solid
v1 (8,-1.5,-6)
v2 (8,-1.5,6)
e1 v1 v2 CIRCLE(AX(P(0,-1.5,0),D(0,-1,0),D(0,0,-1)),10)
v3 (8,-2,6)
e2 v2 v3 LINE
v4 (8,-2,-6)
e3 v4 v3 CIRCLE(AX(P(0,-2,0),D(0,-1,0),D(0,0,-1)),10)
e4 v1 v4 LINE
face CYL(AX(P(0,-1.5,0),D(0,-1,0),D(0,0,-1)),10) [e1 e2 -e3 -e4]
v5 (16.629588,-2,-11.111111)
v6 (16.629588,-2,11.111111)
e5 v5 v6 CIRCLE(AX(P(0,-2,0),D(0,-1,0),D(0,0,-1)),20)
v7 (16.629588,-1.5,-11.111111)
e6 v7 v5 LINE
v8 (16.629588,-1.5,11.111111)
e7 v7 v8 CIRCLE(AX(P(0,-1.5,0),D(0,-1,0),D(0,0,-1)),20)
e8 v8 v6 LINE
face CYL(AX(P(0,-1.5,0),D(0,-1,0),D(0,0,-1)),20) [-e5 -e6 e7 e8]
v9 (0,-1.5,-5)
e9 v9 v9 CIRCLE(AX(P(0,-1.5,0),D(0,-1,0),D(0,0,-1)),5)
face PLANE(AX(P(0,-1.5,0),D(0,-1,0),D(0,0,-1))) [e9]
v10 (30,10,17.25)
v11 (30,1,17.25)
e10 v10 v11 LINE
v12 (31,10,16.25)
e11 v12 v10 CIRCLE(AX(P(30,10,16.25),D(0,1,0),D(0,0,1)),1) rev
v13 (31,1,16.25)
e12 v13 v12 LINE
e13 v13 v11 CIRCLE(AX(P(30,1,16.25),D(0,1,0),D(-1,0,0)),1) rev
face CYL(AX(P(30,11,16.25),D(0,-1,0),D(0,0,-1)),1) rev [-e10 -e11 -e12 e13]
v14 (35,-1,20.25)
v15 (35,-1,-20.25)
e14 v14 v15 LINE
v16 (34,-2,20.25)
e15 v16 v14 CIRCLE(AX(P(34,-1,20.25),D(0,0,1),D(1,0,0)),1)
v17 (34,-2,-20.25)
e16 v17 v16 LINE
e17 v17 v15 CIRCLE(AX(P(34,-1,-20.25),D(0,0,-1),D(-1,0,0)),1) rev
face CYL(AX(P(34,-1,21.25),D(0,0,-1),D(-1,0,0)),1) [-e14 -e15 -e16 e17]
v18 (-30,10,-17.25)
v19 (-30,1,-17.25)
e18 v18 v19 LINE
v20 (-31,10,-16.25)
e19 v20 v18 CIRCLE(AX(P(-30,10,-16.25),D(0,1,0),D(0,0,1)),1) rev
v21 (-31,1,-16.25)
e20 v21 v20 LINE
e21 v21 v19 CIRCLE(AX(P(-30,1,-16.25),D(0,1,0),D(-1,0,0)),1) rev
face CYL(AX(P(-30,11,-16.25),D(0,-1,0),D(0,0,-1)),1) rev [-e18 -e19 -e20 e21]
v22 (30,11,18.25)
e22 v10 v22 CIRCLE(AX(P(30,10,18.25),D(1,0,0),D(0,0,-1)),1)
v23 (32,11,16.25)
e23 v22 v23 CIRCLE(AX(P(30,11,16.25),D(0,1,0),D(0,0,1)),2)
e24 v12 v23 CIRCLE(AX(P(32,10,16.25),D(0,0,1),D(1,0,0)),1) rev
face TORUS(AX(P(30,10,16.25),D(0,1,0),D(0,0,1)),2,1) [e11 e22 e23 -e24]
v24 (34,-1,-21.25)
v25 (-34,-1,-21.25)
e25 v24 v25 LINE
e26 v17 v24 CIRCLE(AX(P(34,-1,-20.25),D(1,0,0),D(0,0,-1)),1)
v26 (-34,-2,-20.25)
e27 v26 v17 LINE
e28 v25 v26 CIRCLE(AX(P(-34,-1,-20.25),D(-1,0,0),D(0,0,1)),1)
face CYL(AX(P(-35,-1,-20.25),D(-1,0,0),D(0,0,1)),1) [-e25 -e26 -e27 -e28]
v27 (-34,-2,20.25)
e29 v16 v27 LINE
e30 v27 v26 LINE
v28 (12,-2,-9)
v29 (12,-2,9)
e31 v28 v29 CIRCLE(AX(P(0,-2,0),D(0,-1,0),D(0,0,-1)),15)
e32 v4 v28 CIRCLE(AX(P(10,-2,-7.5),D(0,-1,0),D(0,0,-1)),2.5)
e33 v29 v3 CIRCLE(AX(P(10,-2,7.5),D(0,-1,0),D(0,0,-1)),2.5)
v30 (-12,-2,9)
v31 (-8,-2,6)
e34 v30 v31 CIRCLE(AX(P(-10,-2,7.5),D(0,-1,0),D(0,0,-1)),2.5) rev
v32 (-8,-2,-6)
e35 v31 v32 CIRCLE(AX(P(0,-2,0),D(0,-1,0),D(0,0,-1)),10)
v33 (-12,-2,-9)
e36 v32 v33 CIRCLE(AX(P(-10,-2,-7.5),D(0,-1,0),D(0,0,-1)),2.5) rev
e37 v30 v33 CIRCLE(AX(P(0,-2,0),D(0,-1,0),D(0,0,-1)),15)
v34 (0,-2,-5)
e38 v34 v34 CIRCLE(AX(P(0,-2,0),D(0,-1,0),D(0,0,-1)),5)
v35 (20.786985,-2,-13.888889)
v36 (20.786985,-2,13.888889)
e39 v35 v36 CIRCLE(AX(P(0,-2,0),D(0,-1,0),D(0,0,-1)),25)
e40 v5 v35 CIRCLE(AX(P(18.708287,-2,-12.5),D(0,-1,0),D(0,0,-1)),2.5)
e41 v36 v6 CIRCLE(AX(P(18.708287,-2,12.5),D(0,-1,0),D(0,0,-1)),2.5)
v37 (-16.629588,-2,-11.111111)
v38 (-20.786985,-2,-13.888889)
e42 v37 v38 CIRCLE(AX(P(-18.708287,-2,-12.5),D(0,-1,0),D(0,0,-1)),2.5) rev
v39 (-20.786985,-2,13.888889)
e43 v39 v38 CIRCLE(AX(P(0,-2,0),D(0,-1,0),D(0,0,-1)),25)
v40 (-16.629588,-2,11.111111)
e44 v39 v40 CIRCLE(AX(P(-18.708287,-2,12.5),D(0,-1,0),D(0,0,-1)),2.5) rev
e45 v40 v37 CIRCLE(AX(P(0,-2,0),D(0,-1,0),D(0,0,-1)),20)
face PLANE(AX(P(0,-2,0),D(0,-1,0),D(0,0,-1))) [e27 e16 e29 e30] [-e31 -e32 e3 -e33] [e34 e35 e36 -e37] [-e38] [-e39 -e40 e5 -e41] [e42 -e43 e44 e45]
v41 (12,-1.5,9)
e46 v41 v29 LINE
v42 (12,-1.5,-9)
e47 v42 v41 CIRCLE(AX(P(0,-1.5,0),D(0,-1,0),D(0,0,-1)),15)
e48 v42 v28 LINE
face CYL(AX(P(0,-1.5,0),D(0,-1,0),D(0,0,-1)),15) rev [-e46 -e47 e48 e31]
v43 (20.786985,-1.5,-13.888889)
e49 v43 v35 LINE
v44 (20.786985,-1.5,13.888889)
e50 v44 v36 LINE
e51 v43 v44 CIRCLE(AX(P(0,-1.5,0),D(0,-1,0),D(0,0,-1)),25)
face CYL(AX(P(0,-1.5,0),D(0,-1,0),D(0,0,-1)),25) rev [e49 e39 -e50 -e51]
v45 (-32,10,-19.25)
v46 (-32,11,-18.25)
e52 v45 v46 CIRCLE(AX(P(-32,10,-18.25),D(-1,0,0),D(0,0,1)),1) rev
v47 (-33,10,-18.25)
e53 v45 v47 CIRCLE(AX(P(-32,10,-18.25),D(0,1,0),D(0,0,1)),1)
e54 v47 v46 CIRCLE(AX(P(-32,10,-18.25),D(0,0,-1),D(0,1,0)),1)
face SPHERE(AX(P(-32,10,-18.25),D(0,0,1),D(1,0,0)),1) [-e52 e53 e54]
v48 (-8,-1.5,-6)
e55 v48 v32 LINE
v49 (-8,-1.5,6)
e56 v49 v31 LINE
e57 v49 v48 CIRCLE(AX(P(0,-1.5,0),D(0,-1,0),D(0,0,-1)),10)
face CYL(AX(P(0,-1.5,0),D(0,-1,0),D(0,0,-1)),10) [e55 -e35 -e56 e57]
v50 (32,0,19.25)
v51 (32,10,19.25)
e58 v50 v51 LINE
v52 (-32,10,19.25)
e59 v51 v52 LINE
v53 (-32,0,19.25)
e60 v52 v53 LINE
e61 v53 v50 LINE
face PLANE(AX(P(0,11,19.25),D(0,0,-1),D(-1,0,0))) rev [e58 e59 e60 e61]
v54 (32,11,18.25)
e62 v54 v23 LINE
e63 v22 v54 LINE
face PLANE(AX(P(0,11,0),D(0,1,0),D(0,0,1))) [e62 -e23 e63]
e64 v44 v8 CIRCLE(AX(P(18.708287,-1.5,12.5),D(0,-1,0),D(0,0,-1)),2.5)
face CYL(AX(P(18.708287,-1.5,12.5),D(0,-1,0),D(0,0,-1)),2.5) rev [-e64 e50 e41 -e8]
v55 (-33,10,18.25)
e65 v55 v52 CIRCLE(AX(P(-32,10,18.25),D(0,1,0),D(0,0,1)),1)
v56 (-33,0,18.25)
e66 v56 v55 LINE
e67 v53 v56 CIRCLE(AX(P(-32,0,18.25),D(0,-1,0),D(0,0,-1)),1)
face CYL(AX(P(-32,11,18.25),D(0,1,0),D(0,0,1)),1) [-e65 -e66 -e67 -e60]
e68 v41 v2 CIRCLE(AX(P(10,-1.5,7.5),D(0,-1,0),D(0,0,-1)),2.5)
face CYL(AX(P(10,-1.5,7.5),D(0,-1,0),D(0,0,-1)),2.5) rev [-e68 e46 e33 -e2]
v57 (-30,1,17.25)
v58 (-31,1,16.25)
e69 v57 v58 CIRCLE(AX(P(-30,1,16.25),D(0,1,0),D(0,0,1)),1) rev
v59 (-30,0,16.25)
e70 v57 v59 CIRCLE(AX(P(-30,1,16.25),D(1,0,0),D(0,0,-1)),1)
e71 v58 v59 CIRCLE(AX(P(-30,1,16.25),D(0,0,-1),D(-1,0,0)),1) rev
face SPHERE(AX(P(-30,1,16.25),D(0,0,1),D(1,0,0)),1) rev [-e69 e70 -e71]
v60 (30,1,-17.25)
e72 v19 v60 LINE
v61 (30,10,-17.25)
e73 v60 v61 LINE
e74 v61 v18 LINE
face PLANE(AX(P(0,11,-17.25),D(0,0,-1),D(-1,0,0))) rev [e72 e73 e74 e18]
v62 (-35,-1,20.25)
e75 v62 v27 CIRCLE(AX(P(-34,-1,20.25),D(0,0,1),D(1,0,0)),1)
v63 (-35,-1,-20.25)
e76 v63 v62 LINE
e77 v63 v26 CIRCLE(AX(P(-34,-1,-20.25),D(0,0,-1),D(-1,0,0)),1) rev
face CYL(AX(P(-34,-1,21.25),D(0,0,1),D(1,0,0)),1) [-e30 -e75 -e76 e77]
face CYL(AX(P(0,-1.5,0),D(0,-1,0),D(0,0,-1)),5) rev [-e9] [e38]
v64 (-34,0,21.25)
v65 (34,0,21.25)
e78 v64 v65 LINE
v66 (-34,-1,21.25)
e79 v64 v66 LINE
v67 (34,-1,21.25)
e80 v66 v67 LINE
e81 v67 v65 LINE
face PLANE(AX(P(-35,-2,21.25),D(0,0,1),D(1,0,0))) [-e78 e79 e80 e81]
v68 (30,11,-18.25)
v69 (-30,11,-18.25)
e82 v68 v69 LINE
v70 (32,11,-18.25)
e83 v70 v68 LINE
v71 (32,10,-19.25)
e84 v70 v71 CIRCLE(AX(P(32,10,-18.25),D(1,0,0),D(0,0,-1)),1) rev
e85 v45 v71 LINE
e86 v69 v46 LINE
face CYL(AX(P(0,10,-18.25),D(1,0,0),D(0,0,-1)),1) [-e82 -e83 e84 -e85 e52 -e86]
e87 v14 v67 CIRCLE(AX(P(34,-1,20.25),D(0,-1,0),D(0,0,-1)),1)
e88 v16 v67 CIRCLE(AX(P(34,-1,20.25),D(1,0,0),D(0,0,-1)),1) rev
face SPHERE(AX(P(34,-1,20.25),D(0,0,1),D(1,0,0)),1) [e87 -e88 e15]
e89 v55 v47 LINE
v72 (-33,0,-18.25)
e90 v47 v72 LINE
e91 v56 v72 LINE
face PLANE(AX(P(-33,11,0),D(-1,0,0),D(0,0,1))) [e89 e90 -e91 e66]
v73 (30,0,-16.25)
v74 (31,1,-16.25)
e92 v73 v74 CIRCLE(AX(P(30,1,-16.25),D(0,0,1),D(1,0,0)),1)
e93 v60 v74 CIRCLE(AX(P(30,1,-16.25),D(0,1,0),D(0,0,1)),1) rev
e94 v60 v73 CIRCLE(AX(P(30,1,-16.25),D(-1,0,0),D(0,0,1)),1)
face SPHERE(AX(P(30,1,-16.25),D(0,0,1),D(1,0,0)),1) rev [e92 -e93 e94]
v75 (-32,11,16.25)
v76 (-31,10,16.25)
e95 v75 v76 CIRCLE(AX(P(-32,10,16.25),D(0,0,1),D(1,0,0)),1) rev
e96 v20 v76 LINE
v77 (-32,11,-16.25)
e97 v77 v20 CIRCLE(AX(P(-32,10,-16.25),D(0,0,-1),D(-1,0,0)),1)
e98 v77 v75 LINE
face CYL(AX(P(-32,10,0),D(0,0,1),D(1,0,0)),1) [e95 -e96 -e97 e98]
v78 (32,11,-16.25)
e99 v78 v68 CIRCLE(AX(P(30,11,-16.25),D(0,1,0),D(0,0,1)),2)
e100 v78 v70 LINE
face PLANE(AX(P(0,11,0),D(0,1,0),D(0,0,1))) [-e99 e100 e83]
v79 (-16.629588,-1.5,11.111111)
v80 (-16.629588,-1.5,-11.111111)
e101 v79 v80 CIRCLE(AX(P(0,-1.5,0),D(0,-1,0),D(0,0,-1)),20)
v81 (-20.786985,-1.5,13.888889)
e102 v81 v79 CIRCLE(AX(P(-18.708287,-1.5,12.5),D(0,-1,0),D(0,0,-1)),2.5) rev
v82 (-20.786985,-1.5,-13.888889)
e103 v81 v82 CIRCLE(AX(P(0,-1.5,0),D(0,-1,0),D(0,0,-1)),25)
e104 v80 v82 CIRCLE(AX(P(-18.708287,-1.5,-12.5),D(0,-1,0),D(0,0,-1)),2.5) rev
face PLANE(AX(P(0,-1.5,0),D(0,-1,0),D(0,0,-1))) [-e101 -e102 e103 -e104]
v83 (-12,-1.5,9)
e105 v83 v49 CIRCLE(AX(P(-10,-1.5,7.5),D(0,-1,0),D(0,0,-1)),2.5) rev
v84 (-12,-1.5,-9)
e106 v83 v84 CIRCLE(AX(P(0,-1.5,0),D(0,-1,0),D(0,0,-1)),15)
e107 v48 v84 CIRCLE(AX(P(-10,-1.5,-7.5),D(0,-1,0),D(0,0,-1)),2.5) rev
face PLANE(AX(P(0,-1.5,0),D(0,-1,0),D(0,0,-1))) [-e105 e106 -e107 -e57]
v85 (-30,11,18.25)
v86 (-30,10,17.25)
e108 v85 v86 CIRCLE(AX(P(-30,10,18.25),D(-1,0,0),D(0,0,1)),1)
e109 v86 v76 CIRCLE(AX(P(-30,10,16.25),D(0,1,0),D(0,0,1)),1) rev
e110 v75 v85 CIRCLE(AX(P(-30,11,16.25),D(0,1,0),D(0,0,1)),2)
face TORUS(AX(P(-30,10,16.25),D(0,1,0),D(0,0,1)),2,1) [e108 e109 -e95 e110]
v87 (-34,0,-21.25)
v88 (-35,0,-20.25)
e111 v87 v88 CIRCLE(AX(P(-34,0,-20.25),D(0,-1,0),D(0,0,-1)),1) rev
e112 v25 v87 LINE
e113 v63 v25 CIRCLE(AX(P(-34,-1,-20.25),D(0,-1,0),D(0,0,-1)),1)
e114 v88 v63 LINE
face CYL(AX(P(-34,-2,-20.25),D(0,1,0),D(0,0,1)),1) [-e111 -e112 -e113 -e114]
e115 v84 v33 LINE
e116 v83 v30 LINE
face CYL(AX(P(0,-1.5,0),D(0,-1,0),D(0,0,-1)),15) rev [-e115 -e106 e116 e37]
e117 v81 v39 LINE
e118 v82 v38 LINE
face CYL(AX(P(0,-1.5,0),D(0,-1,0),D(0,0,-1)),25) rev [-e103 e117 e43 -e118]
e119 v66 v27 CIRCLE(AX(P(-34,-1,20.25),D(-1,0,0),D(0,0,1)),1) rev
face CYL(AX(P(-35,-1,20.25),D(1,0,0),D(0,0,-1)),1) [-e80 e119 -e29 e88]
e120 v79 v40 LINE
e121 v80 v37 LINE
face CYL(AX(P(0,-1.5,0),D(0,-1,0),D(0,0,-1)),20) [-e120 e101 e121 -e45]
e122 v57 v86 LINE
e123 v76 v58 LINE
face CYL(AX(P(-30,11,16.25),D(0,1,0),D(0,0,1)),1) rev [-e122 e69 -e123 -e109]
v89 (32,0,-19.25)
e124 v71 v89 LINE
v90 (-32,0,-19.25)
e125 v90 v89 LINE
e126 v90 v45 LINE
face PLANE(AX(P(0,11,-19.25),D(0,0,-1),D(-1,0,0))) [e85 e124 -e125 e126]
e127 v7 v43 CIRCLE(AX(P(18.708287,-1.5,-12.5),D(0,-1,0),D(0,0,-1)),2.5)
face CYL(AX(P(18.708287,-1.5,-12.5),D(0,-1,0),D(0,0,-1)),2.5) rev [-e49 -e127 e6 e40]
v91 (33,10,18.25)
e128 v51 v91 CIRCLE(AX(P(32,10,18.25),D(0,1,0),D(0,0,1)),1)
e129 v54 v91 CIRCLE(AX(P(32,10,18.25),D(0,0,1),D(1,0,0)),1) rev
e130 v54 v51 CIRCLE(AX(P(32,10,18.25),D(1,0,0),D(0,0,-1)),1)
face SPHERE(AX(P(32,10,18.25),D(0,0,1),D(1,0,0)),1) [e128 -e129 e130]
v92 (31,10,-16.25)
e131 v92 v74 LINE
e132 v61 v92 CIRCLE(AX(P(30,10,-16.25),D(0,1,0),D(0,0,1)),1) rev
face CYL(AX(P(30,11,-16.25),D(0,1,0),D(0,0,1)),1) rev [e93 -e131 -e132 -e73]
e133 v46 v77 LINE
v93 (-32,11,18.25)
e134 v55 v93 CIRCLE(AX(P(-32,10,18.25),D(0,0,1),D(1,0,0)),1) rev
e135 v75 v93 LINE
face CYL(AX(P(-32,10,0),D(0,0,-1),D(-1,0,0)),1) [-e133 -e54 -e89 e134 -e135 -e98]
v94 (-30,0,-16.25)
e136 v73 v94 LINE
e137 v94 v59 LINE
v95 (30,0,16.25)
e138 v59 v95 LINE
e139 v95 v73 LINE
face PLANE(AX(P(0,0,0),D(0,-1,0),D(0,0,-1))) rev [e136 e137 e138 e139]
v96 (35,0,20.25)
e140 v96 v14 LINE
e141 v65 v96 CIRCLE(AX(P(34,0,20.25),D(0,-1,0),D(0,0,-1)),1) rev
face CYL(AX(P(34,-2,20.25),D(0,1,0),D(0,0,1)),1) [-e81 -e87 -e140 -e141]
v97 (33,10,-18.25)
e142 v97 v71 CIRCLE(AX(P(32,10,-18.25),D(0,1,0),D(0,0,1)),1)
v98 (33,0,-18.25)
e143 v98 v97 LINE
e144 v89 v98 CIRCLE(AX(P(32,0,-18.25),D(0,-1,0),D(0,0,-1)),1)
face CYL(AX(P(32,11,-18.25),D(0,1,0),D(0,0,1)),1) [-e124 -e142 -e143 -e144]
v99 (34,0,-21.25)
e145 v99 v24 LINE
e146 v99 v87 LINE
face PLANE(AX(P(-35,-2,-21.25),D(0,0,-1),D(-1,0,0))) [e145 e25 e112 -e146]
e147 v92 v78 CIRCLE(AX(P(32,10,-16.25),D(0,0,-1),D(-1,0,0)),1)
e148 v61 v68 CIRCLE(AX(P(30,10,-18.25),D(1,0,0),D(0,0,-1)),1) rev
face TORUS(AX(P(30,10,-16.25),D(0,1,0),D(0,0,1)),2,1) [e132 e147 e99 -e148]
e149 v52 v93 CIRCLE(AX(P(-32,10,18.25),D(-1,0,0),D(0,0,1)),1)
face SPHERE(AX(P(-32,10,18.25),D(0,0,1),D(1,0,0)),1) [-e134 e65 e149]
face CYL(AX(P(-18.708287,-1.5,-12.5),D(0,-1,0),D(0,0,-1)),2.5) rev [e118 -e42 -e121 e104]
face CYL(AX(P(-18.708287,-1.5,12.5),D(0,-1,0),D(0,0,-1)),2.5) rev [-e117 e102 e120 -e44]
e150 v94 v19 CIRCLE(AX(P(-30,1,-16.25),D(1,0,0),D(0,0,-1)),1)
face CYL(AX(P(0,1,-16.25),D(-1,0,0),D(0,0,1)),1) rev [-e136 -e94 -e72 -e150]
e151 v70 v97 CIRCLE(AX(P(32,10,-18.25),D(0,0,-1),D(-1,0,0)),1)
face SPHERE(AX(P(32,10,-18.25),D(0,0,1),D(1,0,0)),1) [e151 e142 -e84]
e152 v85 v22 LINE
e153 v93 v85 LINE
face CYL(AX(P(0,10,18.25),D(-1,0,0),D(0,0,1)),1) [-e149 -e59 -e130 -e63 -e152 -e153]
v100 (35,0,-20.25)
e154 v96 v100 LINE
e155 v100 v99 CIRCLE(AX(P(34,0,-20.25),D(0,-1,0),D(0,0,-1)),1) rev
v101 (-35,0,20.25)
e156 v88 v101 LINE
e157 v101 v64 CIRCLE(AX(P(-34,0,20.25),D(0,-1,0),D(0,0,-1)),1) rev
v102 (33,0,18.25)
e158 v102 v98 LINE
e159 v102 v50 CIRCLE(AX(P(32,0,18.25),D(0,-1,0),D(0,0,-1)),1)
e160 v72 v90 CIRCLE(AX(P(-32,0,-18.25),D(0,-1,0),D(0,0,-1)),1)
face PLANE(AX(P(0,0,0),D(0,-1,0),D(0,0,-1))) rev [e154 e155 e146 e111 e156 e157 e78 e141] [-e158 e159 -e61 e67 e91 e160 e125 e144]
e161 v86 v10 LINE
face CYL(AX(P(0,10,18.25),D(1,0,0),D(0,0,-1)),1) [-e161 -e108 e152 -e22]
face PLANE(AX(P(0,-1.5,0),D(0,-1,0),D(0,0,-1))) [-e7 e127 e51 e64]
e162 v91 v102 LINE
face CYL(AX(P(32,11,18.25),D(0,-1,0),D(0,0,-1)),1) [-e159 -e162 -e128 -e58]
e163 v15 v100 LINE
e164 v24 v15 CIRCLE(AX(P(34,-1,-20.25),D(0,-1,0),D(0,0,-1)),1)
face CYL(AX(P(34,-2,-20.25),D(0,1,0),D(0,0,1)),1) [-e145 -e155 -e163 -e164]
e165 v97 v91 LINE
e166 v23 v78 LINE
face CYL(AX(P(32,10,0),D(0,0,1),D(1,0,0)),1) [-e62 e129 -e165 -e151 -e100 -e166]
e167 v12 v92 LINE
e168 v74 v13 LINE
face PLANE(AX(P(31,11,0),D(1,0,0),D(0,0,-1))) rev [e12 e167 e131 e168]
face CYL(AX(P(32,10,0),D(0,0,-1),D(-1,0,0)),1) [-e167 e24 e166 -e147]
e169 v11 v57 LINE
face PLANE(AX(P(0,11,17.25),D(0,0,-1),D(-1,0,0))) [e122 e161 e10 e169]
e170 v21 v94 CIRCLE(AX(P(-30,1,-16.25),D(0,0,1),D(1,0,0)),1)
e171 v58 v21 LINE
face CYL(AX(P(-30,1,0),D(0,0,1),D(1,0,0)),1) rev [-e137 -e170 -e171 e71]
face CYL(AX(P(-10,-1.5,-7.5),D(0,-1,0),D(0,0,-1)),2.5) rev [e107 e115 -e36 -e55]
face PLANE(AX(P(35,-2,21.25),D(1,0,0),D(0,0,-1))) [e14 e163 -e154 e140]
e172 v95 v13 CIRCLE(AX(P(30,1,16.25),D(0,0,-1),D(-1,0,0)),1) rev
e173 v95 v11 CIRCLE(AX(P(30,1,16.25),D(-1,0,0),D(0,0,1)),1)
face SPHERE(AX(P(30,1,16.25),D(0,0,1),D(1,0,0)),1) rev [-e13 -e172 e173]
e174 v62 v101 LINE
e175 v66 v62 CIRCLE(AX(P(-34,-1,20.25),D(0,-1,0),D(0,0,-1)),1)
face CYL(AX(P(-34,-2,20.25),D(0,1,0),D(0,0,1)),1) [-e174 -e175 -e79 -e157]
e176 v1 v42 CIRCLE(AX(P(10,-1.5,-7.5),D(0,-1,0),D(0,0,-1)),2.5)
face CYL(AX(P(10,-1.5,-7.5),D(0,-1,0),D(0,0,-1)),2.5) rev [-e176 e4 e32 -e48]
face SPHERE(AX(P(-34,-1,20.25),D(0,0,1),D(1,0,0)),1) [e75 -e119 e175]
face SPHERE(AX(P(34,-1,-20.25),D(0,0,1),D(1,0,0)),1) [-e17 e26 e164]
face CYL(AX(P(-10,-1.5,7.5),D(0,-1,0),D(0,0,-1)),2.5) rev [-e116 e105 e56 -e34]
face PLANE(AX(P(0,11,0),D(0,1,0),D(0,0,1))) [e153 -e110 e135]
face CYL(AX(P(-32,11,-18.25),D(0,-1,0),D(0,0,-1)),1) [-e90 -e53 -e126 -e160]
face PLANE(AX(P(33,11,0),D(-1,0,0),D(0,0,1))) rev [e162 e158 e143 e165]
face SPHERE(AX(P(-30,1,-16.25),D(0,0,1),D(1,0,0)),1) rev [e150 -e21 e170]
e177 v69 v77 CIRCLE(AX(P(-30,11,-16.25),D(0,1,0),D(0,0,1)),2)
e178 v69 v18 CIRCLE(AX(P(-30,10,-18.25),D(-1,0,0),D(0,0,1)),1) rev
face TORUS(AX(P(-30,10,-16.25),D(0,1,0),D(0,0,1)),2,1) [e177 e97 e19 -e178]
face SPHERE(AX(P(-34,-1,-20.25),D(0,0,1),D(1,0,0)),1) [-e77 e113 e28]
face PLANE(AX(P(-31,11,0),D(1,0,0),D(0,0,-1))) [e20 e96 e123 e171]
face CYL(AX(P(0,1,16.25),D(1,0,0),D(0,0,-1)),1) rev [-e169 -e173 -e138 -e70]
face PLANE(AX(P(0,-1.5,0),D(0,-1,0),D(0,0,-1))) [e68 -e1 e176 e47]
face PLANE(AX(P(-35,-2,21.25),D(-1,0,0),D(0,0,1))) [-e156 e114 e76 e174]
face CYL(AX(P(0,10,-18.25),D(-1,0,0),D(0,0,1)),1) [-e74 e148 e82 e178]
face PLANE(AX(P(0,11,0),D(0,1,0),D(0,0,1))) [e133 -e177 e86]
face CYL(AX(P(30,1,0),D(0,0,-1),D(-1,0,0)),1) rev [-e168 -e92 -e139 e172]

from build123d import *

# Parameters (mm, degrees)
SKETCH1_W           = 70
SKETCH1_H           = 42.5
BOSS_EXTRUDE1_DEPTH = 2
SKETCH2_W           = 66
SKETCH2_H           = 38.5
SKETCH2_W_2         = 62
SKETCH2_H_2         = 34.5
BOSS_EXTRUDE2_DEPTH = 11
FILLET1_R           = 1
SKETCH3_R           = 5
CUT_EXTRUDE1_DEPTH  = 0.5


with BuildPart() as part:
    # Sketch1 → Boss-Extrude1 (new body)
    with BuildSketch(Plane(origin=(0, 0, 0), x_dir=(1, 0, 0), z_dir=(0, 1, 0))):
        Rectangle(SKETCH1_W, SKETCH1_H)
    extrude(amount=-BOSS_EXTRUDE1_DEPTH)

    # Sketch2 → Boss-Extrude2 (add)
    with BuildSketch(Plane(origin=(0, 0, 0), x_dir=(-1, 0, 0), z_dir=(0, 1, 0))):
        Rectangle(SKETCH2_W, SKETCH2_H)
        Rectangle(SKETCH2_W_2, SKETCH2_H_2, mode=Mode.SUBTRACT)
    extrude(amount=BOSS_EXTRUDE2_DEPTH)

    # Fillet1
    fillet1_edges = [part.edges().sort_by_distance(p)[0] for p in [
        (35, -2, 0),
        (0, -2, -21.25),
        (0, 0, -17.25),
        (-31, 5.5, -17.25),
        (31, 0, 0),
        (31, 5.5, -17.25),
        (0, 11, 17.25),
        (31, 5.5, 17.25),
        (-33, 5.5, 19.25),
        (33, 5.5, 19.25),
        (0, 11, -19.25),
        (33, 5.5, -19.25),
        (-33, 11, 0),
        (-33, 5.5, -19.25),
        (-31, 11, 0),
        (-31, 5.5, 17.25),
        (0, 11, 19.25),
        (33, 11, 0),
        (0, 11, -17.25),
        (31, 11, 0),
        (-31, 0, 0),
        (0, 0, 17.25),
        (-35, -2, 0),
        (-35, -1, -21.25),
        (35, -1, -21.25),
        (35, -1, 21.25),
        (-35, -1, 21.25),
        (0, -2, 21.25),
    ]]
    fillet(fillet1_edges, radius=FILLET1_R - 0.0001)  # a hair under: the kernel refuses the full size

    # Sketch3 → Cut-Extrude1 (cut)
    with BuildSketch(Plane.XZ.offset(2)):
        with BuildLine():
            ThreePointArc((12.000000021, 8.999999972), (8.499999983, 9.499999987), (8.000000047, 5.999999937))
            ThreePointArc((8.000000047, 5.999999937), (10, -3.8e-08), (8.000000001, -5.999999998))
            ThreePointArc((8.000000001, -5.999999998), (8.499999982, -9.499999987), (11.999999975, -9.000000033))
            ThreePointArc((11.999999975, -9.000000033), (15, -3.8e-08), (12.000000021, 8.999999972))
        make_face()
        with Locations(Location((0, 0, 0), (0, 0, 270))):
            Circle(SKETCH3_R)
        with BuildLine():
            ThreePointArc((-8.000000081, -5.999999892), (-10, -1.9e-08), (-8.000000104, 5.999999861))
            ThreePointArc((-8.000000104, 5.999999861), (-8.499999944, 9.499999958), (-12.000000021, 8.999999972))
            ThreePointArc((-12.000000021, 8.999999972), (-15, 3.8e-08), (-12.000000067, -8.999999911))
            ThreePointArc((-12.000000067, -8.999999911), (-8.49999999, -9.499999993), (-8.000000081, -5.999999892))
        make_face()
        with BuildLine():
            ThreePointArc((16.62958836, 11.111111149), (20, -3.3e-08), (16.629588323, -11.111111204))
            ThreePointArc((16.629588323, -11.111111204), (17.319398074, -14.578698568), (20.786985459, -13.888888924))
            ThreePointArc((20.786985459, -13.888888924), (25, -2.4e-08), (20.786985486, 13.888888883))
            ThreePointArc((20.786985486, 13.888888883), (17.319398067, 14.578698563), (16.62958836, 11.111111149))
        make_face()
        with BuildLine():
            ThreePointArc((-16.629588323, -11.111111204), (-20, 2.3e-08), (-16.629588298, 11.111111242))
            ThreePointArc((-16.629588298, 11.111111242), (-17.319398098, 14.578698584), (-20.786985465, 13.888888914))
            ThreePointArc((-20.786985465, 13.888888914), (-25, -1.1e-08), (-20.786985453, -13.888888933))
            ThreePointArc((-20.786985453, -13.888888933), (-17.31939807, -14.578698565), (-16.629588323, -11.111111204))
        make_face()
    extrude(amount=-CUT_EXTRUDE1_DEPTH, mode=Mode.SUBTRACT)


solid = part.part
